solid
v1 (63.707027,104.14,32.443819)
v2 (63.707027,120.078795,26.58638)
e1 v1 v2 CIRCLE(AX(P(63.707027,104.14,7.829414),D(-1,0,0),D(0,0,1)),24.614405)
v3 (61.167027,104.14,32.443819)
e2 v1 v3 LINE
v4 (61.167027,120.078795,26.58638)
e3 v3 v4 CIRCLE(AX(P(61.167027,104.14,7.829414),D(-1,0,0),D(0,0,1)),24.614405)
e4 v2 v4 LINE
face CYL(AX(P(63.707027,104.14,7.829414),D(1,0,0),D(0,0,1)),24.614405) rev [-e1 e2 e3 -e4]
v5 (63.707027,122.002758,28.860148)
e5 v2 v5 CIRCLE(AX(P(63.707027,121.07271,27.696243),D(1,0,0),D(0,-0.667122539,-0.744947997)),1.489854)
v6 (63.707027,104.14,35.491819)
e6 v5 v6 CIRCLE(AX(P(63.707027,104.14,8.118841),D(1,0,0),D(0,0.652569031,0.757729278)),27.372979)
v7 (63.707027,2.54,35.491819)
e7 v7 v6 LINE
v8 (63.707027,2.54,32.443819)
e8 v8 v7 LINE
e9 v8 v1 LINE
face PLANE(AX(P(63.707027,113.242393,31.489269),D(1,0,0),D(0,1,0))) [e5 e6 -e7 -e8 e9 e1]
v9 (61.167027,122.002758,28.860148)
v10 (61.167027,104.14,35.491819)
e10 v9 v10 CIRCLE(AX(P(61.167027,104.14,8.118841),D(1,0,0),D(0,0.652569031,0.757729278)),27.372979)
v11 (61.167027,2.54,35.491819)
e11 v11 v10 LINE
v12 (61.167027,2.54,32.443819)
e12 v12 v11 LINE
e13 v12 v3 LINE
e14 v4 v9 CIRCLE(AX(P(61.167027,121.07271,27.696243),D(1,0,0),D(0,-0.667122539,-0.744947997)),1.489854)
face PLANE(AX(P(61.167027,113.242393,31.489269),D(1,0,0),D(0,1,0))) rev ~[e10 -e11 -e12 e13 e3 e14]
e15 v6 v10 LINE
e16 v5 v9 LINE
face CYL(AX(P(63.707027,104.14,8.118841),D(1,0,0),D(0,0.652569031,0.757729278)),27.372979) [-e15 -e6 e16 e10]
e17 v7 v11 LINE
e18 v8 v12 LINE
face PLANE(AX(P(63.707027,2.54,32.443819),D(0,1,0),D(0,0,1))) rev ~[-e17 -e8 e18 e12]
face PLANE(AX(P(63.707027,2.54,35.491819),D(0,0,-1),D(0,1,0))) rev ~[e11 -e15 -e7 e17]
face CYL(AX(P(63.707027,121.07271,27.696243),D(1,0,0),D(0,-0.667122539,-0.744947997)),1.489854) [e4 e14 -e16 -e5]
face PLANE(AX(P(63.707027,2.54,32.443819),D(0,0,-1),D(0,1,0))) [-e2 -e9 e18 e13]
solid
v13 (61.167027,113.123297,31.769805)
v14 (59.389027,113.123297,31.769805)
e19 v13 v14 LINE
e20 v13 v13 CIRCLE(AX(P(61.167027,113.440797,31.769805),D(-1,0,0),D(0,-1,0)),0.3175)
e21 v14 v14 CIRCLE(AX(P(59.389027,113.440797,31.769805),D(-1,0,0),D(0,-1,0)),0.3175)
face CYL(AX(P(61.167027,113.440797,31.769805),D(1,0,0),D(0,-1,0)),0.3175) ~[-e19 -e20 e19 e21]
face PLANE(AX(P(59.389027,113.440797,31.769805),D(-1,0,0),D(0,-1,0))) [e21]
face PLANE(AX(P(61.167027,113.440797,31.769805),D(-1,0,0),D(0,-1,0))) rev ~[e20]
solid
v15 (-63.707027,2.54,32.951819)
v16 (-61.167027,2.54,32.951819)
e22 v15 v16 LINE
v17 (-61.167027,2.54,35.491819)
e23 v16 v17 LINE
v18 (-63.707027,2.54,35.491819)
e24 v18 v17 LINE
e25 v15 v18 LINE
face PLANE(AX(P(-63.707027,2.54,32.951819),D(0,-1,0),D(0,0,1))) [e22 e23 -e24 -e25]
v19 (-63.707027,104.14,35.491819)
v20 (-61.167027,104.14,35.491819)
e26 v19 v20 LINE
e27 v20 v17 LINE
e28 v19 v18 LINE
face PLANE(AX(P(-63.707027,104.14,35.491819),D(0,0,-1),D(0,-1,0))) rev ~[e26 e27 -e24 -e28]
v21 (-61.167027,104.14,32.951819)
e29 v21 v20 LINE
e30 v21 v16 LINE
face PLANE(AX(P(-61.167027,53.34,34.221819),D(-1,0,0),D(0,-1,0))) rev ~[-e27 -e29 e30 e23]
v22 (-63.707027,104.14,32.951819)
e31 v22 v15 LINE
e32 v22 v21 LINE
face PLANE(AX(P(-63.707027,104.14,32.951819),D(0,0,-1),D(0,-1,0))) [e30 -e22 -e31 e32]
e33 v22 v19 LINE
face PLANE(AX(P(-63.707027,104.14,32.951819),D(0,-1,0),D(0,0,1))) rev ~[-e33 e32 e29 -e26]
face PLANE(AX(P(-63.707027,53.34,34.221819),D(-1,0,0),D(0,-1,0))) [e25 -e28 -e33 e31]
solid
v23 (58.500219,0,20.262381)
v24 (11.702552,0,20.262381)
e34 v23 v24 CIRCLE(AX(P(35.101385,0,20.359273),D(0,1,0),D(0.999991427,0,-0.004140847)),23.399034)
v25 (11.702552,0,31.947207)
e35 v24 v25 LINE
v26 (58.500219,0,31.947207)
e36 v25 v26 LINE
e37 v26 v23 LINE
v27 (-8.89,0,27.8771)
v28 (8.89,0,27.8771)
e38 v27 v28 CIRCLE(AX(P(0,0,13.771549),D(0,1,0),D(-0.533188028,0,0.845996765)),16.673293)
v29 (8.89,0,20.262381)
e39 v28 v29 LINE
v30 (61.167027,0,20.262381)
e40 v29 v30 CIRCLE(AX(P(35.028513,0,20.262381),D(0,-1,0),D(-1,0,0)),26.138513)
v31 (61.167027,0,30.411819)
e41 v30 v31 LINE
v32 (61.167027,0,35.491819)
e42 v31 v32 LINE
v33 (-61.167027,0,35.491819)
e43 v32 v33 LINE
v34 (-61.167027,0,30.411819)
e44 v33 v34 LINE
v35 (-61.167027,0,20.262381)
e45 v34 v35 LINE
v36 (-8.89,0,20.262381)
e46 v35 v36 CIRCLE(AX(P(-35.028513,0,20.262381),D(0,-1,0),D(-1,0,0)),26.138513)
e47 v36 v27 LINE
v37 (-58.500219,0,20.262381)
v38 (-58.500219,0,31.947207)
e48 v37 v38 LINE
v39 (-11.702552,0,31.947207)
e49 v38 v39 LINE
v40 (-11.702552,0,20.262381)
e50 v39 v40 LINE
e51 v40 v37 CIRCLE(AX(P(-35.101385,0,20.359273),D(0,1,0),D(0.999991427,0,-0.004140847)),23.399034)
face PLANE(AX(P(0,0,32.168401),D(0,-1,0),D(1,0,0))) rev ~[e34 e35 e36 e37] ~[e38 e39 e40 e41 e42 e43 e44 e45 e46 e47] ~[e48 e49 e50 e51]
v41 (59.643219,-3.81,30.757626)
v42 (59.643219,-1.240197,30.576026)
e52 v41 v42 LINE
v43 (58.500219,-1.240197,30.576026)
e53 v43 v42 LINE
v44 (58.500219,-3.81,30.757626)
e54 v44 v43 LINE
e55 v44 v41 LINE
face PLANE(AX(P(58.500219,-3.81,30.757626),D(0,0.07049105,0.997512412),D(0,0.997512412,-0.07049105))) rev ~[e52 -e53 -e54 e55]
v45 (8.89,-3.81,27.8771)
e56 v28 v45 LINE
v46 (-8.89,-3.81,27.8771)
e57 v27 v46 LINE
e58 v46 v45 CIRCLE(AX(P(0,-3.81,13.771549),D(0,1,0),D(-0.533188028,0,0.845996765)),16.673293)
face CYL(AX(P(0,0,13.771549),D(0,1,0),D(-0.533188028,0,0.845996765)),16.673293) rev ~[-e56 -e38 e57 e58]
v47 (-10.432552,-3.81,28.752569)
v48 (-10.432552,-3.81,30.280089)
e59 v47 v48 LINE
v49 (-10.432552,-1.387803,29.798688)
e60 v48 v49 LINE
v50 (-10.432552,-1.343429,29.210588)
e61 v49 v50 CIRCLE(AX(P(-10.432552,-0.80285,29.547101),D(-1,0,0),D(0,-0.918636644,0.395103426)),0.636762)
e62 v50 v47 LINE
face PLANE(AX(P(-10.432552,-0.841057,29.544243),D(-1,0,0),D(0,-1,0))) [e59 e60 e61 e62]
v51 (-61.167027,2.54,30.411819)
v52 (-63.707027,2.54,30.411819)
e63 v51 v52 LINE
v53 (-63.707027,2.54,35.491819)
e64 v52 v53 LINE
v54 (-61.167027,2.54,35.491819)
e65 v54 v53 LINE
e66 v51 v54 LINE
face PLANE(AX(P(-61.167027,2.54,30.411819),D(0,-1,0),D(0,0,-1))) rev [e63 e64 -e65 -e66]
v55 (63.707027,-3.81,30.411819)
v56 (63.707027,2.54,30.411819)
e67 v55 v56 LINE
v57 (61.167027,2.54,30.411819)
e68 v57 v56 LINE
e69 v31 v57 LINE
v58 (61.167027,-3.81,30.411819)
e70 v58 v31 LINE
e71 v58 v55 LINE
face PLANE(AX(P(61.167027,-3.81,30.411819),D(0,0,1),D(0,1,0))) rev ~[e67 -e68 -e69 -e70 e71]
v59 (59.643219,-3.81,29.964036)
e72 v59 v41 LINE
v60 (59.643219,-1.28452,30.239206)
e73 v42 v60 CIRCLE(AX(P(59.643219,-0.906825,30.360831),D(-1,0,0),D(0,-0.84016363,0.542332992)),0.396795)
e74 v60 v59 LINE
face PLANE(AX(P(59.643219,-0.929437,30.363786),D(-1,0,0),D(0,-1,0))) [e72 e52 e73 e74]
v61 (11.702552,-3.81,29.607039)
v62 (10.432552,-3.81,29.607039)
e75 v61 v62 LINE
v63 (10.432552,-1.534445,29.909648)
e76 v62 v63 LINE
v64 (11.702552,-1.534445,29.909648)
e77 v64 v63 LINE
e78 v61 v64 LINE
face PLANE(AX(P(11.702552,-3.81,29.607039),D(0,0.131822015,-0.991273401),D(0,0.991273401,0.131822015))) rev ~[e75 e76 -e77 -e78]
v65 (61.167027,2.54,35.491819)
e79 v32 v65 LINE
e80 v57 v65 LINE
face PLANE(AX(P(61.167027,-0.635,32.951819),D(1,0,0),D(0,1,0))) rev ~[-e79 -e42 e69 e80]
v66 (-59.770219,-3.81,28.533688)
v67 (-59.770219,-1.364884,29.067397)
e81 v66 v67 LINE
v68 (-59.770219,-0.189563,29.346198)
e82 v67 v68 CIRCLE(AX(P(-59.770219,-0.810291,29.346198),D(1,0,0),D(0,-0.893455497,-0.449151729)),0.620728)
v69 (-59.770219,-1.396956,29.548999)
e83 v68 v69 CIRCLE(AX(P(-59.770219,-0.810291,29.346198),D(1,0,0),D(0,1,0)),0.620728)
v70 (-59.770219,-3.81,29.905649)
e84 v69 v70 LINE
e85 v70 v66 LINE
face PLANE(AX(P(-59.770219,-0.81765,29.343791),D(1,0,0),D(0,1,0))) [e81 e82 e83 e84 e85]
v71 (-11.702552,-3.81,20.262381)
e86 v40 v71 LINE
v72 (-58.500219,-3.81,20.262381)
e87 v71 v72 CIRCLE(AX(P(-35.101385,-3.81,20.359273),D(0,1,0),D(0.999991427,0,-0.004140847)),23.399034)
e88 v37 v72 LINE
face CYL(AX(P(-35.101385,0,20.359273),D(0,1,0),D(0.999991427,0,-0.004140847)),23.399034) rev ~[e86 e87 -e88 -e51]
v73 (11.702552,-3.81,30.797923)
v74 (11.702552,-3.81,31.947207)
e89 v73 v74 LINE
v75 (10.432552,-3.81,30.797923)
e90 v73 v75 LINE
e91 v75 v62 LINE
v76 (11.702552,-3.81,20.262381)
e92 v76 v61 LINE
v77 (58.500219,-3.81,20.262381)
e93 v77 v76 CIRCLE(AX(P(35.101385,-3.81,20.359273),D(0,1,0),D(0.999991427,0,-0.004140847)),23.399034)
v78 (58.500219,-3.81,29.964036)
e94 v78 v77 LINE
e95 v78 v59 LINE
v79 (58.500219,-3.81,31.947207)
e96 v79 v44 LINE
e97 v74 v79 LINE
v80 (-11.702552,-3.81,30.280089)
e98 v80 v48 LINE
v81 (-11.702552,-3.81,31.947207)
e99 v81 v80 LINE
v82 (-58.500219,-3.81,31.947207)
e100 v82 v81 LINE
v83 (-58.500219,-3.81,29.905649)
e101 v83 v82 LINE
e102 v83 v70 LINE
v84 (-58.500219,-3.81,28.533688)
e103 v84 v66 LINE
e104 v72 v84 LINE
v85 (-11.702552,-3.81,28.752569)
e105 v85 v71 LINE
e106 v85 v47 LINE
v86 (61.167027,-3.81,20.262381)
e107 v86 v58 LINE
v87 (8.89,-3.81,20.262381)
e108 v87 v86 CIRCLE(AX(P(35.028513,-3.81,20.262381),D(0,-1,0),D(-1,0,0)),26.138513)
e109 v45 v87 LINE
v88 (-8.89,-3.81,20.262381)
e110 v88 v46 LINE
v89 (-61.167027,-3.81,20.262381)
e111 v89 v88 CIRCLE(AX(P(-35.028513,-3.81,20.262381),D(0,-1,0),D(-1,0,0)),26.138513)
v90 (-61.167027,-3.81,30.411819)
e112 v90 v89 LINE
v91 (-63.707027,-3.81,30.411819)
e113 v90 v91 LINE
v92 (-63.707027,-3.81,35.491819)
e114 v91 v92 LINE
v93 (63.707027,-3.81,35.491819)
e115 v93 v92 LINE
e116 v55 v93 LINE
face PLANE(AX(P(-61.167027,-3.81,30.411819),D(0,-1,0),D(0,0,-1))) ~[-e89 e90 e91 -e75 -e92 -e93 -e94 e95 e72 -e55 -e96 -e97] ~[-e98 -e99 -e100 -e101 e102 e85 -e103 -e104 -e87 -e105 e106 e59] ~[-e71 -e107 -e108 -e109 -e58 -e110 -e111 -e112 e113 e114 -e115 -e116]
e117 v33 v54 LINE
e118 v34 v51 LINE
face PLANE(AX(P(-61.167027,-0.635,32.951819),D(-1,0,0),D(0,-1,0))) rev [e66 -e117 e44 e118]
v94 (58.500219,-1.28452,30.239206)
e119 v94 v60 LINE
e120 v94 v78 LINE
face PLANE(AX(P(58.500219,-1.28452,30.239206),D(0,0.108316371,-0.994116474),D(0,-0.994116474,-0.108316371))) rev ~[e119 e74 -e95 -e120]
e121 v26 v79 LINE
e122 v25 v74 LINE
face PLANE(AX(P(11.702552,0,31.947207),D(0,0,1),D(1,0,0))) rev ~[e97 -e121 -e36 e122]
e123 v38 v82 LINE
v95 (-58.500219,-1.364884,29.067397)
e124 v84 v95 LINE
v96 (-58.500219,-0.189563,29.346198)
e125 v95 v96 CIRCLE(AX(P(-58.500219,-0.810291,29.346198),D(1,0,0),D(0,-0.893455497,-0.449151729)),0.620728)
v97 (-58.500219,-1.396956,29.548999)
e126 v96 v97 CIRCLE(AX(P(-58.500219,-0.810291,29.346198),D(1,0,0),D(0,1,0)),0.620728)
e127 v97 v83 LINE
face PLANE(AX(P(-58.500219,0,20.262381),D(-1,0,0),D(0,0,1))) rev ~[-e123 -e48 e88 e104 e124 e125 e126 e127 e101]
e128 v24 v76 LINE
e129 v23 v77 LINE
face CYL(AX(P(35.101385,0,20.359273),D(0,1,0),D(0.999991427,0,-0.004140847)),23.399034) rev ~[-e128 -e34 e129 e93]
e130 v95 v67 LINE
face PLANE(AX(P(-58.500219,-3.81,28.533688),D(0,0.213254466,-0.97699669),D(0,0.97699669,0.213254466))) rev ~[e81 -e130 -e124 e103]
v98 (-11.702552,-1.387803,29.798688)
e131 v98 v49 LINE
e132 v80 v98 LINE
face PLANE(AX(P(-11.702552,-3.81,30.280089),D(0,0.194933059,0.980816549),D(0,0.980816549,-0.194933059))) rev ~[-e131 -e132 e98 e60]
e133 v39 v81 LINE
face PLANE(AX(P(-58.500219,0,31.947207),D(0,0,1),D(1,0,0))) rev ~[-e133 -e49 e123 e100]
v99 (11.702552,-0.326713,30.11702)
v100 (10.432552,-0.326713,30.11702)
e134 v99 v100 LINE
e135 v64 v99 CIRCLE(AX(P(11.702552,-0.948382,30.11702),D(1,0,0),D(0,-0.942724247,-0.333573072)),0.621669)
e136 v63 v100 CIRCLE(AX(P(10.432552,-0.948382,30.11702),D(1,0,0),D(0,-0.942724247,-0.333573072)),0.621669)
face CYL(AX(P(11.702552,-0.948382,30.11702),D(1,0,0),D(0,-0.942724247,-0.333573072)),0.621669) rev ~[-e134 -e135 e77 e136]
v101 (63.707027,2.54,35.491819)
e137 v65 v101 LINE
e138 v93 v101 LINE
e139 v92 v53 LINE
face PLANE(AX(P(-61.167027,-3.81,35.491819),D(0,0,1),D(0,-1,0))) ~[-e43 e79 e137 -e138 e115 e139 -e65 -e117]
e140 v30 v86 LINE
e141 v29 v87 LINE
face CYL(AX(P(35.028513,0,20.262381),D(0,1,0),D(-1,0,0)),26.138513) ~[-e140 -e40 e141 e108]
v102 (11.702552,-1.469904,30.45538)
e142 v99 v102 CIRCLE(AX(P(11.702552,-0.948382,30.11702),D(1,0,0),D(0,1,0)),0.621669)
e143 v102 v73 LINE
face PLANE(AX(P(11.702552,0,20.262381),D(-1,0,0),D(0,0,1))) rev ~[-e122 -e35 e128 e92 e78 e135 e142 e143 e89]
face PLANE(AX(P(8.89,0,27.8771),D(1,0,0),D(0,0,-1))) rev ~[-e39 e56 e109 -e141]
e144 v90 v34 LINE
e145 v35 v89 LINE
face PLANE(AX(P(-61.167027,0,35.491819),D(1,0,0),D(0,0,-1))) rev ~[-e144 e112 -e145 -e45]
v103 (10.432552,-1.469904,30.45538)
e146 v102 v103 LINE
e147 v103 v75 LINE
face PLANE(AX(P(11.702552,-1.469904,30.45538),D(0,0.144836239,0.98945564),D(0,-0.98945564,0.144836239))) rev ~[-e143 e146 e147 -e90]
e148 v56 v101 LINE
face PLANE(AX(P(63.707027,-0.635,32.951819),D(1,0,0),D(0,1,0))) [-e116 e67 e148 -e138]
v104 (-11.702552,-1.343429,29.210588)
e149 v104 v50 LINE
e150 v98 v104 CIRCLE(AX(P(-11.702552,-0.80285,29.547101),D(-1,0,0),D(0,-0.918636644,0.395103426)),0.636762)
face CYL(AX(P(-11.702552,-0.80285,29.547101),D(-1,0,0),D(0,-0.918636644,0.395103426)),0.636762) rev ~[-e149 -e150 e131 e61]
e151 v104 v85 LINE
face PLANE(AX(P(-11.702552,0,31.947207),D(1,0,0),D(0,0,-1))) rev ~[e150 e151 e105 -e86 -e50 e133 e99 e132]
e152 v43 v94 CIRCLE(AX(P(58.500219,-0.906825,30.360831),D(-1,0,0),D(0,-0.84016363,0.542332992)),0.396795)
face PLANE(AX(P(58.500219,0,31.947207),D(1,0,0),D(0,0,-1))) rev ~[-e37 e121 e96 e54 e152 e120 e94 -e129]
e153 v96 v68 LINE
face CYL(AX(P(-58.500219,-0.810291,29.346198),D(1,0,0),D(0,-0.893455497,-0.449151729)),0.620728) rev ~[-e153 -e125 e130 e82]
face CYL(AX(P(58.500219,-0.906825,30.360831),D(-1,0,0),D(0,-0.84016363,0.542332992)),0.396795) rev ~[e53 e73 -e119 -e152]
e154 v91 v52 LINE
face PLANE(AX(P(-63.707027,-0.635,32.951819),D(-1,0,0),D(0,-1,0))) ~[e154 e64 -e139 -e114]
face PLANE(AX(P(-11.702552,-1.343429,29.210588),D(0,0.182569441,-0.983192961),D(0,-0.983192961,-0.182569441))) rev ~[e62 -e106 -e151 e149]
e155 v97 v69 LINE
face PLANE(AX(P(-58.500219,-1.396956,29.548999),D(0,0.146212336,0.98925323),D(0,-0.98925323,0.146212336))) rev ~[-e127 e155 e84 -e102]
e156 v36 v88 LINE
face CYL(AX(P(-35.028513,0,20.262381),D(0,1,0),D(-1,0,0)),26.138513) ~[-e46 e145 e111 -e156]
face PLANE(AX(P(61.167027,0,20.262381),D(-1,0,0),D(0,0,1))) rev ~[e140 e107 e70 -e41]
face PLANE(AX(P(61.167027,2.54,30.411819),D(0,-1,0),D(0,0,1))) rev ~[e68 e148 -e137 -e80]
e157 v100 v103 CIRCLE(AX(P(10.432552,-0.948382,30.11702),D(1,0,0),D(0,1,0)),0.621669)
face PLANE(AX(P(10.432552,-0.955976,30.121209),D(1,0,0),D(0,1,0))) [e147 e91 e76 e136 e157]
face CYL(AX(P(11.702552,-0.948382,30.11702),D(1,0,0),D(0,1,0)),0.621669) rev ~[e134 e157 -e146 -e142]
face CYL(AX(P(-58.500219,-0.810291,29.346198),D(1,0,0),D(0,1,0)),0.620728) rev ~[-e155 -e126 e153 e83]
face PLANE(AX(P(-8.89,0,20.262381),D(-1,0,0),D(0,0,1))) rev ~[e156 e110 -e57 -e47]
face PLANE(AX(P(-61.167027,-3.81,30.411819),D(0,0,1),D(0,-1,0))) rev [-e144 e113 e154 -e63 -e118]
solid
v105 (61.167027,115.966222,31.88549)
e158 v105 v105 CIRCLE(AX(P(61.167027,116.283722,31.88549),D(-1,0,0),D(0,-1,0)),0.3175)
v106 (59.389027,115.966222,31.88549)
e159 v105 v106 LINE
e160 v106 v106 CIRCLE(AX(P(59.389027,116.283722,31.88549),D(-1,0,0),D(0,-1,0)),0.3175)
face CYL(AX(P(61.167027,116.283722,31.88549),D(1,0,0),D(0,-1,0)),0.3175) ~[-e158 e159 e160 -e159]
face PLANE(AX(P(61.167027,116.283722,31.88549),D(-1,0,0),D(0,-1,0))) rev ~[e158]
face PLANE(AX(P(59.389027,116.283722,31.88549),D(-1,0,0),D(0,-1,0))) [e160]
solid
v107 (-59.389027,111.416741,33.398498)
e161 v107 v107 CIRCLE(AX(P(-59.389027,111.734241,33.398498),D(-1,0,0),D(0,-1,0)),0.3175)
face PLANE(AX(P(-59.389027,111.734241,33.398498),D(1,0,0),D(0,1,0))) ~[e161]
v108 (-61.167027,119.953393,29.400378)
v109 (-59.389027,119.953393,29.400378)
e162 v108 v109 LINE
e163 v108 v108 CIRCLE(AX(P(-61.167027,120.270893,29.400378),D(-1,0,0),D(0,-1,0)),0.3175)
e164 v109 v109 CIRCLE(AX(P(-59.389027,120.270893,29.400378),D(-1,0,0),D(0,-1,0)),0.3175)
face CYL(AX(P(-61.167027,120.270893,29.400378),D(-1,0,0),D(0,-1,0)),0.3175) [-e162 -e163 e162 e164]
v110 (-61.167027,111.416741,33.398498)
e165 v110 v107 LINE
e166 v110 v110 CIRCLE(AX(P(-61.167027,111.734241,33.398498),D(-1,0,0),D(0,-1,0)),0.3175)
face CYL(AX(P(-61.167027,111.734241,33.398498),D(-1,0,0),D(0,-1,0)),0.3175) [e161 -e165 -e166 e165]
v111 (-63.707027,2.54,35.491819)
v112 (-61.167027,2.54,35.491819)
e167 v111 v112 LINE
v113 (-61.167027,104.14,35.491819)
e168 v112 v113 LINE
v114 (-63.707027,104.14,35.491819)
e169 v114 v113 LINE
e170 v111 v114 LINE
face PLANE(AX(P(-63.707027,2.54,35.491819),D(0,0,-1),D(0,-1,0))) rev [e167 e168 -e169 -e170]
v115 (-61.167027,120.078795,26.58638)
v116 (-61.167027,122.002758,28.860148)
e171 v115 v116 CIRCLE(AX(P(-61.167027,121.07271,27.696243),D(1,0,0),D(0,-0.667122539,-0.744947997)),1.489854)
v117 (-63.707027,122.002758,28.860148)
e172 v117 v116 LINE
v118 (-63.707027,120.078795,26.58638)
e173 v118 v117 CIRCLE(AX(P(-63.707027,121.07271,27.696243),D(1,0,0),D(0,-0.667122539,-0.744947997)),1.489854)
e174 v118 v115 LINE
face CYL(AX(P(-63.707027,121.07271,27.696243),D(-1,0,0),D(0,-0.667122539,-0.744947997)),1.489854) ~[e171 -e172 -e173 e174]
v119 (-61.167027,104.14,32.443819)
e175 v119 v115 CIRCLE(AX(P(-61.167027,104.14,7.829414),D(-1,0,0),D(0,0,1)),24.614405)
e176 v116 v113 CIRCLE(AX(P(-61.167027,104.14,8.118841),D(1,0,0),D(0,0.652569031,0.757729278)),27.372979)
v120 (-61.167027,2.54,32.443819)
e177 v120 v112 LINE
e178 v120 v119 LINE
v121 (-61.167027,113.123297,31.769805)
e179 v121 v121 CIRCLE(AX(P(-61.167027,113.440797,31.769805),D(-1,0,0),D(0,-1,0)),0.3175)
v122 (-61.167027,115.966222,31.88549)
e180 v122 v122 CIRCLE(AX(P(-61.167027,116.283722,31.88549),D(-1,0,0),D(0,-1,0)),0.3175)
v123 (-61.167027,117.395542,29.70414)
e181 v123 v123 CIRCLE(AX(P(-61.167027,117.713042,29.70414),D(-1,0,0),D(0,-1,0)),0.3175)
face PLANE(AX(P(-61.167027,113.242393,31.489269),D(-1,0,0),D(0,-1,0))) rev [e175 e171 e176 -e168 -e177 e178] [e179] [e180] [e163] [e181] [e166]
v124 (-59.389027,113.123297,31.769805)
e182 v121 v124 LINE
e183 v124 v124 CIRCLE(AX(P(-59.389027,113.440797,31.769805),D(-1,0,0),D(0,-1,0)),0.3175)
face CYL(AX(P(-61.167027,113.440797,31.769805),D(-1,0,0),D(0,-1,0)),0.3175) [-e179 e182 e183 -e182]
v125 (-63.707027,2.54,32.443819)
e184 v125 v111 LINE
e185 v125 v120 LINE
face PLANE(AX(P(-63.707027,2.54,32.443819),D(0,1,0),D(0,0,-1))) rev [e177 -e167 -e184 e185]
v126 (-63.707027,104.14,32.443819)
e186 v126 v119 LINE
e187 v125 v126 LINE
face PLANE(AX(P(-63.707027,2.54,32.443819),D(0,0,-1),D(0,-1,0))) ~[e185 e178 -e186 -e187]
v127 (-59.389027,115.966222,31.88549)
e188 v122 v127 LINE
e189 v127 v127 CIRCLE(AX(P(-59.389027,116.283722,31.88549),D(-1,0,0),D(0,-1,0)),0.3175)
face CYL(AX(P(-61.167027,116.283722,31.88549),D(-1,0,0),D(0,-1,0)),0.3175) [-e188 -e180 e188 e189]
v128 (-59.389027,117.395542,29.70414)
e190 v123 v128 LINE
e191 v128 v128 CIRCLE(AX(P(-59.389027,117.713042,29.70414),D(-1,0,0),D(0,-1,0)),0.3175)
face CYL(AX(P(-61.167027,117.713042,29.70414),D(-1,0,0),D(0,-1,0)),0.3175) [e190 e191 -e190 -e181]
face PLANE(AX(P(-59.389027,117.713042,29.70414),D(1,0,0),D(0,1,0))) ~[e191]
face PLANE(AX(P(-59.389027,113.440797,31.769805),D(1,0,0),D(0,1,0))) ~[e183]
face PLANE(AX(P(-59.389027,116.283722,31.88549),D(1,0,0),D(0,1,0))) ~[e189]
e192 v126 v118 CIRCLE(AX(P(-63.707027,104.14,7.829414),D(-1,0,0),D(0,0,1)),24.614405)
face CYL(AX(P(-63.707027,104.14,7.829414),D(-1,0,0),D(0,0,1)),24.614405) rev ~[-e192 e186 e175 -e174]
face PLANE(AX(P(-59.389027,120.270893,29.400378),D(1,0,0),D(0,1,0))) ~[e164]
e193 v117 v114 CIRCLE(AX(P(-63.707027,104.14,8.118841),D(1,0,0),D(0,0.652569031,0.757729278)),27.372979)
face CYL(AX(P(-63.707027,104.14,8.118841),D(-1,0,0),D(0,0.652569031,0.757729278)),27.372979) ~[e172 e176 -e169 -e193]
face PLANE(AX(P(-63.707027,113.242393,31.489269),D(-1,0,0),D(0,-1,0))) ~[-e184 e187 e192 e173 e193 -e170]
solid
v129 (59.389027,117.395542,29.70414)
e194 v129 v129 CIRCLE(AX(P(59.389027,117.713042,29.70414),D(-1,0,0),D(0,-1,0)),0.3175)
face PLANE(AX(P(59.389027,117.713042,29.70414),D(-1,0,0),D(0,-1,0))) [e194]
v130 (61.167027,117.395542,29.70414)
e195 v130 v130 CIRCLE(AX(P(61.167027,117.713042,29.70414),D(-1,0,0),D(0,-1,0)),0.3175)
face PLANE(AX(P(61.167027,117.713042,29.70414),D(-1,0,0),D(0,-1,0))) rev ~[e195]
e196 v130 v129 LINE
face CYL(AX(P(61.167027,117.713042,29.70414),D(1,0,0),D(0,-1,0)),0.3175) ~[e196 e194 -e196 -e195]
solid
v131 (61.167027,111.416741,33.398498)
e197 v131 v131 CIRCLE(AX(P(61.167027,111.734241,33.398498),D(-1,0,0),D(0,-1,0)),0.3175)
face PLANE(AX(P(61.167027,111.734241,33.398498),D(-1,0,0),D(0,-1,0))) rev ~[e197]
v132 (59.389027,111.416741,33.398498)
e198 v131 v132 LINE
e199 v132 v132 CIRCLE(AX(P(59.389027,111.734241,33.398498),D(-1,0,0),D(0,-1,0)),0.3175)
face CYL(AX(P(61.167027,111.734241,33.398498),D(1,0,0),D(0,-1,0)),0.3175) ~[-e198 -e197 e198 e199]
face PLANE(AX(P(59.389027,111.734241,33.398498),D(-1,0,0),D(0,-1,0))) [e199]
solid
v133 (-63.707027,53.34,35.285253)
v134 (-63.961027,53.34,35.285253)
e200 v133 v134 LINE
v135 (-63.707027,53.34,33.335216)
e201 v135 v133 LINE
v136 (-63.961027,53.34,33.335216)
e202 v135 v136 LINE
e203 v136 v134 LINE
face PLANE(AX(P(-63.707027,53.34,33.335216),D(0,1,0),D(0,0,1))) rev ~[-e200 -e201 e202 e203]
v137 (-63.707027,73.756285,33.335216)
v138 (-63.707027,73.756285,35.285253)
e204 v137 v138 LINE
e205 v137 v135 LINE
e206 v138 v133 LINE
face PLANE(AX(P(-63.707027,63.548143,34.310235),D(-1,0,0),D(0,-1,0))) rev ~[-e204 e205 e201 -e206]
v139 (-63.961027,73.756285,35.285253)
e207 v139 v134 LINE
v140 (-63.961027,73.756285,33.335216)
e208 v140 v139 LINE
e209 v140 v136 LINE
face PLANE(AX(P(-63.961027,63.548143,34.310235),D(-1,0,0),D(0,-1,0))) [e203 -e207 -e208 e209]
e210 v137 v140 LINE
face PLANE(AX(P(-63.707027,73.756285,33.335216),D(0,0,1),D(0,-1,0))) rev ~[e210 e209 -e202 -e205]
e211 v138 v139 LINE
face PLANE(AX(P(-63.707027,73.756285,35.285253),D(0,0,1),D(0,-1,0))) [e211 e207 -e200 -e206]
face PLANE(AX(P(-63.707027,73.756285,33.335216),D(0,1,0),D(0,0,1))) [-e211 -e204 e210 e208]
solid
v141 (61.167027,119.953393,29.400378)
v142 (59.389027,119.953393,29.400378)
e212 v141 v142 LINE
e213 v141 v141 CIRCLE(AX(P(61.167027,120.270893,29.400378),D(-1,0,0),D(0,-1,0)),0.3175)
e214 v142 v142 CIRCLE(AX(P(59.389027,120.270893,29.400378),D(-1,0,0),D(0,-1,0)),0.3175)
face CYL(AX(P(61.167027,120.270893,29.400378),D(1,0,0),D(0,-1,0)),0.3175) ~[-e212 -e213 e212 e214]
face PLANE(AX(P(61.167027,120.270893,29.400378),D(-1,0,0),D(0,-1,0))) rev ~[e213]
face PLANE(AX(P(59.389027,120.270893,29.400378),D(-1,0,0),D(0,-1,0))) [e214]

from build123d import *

# Parameters (mm, degrees)
F1_DEPTH  = 3.81
F2_W      = 6.35
F2_H      = 5.08
F3_DEPTH  = 2.54
F5_W      = 101.6
F5_H      = 3.048
F6_DEPTH  = 2.54
F7_W      = 101.6
F7_H      = 2.54
F8_DEPTH  = 2.54
F9_W      = 20.4162850118
F9_H      = 1.9500367343
F10_DEPTH = 0.254
F12_DEPTH = 2.54
F14_R     = 0.3175
F15_DEPTH = 1.778
F18_DEPTH = 1.143
F20_DEPTH = 1.27
F22_DEPTH = 1.27
F24_DEPTH = 1.27


with BuildPart() as f1:
    # F0 (on Front) → F1 (new body)
    with BuildSketch(Plane.XZ):
        with BuildLine():
            Line((8.89, 35.491819303), (0, 35.491819303))
            Line((0, 35.491819303), (-8.89, 35.491819303))
            Line((-8.89, 35.491819303), (-8.89, 27.8771001825))
            ThreePointArc((-8.89, 27.8771001825), (0, 30.4448411771), (8.89, 27.8771001825))
            Line((8.89, 27.8771001825), (8.89, 35.491819303))
        make_face()
        with BuildLine():
            Line((-8.89, 27.8771001825), (-8.89, 35.491819303))
            Line((-8.89, 35.491819303), (-61.167026878, 35.491819303))
            Line((-61.167026878, 35.491819303), (-61.167026878, 20.2623810619))
            ThreePointArc((-61.167026878, 20.2623810619), (-35.028513439, -5.8761323771), (-8.89, 20.2623810619))
            Line((-8.89, 20.2623810619), (-8.89, 27.8771001825))
        make_face()
        with BuildLine():
            ThreePointArc((-11.7025515065, 20.2623810619), (-35.1013853215, -3.0397615448), (-58.5002191365, 20.2623810619))
            Line((-58.5002191365, 20.2623810619), (-58.5002191365, 31.9472067058))
            Line((-58.5002191365, 31.9472067058), (-11.7025515065, 31.9472067058))
            Line((-11.7025515065, 31.9472067058), (-11.7025515065, 20.2623810619))
        make_face(mode=Mode.SUBTRACT)
        with BuildLine():
            Line((61.167026878, 35.491819303), (8.89, 35.491819303))
            Line((8.89, 35.491819303), (8.89, 27.8771001825))
            Line((8.89, 27.8771001825), (8.89, 20.2623810619))
            ThreePointArc((8.89, 20.2623810619), (35.028513439, -5.8761323771), (61.167026878, 20.2623810619))
            Line((61.167026878, 20.2623810619), (61.167026878, 35.491819303))
        make_face()
        with BuildLine():
            Line((11.7025515065, 31.9472067058), (58.5002191365, 31.9472067058))
            Line((58.5002191365, 31.9472067058), (58.5002191365, 20.2623810619))
            ThreePointArc((58.5002191365, 20.2623810619), (35.1013853215, -3.0397615448), (11.7025515065, 20.2623810619))
            Line((11.7025515065, 20.2623810619), (11.7025515065, 31.9472067058))
        make_face(mode=Mode.SUBTRACT)
    extrude(amount=F1_DEPTH)

    # F2 (on face) → F3 (join)
    with BuildSketch(Plane.YZ.offset(61.167026878)):
        with Locations((-0.635, 32.951819303)):
            Rectangle(F2_W, F2_H)
    extrude(amount=F3_DEPTH)

    # F4: F1 across plane


with BuildPart() as f1_1:
    add(f1.part)
    add(f1.part.mirror(Plane.YZ))

    # F17 (on face) → F18 (cut)
    with BuildSketch(Plane(origin=(58.5002191365, 0, 0), x_dir=(0, -1, 0), z_dir=(-1, 0, 0))):
        with BuildLine():
            ThreePointArc((1.2845198591, 30.239206098), (1.2988156365, 30.2992732373), (1.303619671, 30.3608309478))
            ThreePointArc((1.303619671, 30.3608309478), (1.2874340011, 30.4730040235), (1.2401974525, 30.5760257848))
            ThreePointArc((1.2401974525, 30.5760257848), (0.5134218421, 30.3090626702), (1.2845198591, 30.239206098))
        make_face()
        with BuildLine():
            ThreePointArc((1.2401974525, 30.5760257848), (1.2874340011, 30.4730040235), (1.303619671, 30.3608309478))
            ThreePointArc((1.303619671, 30.3608309478), (1.2988156365, 30.2992732373), (1.2845198591, 30.239206098))
            Line((1.2845198591, 30.239206098), (3.81, 29.9640362842))
            Line((3.81, 29.9640362842), (3.81, 30.7576256113))
            Line((3.81, 30.7576256113), (1.2401974525, 30.5760257848))
        make_face()
    extrude(amount=-F18_DEPTH, mode=Mode.SUBTRACT)

    # F19 (on face) → F20 (cut)
    with BuildSketch(Plane.YZ.offset(11.7025515065)):
        with BuildLine():
            ThreePointArc((-1.5344448459, 29.9096479588), (-0.843178998, 29.5043172702), (-0.3267133253, 30.1170200109))
            ThreePointArc((-0.3267133253, 30.1170200109), (-0.771947349, 30.7131266136), (-1.469903859, 30.455380367))
            ThreePointArc((-1.469903859, 30.455380367), (-1.5657489749, 30.1900328091), (-1.5344448459, 29.9096479588))
        make_face()
        with BuildLine():
            ThreePointArc((-1.5344448459, 29.9096479588), (-1.5657489749, 30.1900328091), (-1.469903859, 30.455380367))
            Line((-1.469903859, 30.455380367), (-3.81, 30.7979229838))
            Line((-3.81, 30.7979229838), (-3.81, 29.607038945))
            Line((-3.81, 29.607038945), (-1.5344448459, 29.9096479588))
        make_face()
    extrude(amount=-F20_DEPTH, mode=Mode.SUBTRACT)

    # F21 (on face) → F22 (cut)
    with BuildSketch(Plane.YZ.offset(-58.5002191365)):
        with BuildLine():
            ThreePointArc((-1.3648844893, 29.0673966875), (-0.6670225121, 28.7422296785), (-0.189563217, 29.3461978436))
            ThreePointArc((-0.189563217, 29.3461978436), (-0.707470296, 29.9583508822), (-1.3969558464, 29.5489992474))
            ThreePointArc((-1.3969558464, 29.5489992474), (-1.4296478817, 29.304953043), (-1.3648844893, 29.0673966875))
        make_face()
        with BuildLine():
            ThreePointArc((-1.3648844893, 29.0673966875), (-1.4296478817, 29.304953043), (-1.3969558464, 29.5489992474))
            Line((-1.3969558464, 29.5489992474), (-3.81, 29.9056489021))
            Line((-3.81, 29.9056489021), (-3.81, 28.5336878151))
            Line((-3.81, 28.5336878151), (-1.3648844893, 29.0673966875))
        make_face()
    extrude(amount=-F22_DEPTH, mode=Mode.SUBTRACT)

    # F23 (on face) → F24 (cut)
    with BuildSketch(Plane(origin=(-11.7025515065, 0, 0), x_dir=(0, -1, 0), z_dir=(-1, 0, 0))):
        with BuildLine():
            ThreePointArc((1.3434285805, 29.2105876086), (1.4150944565, 29.3721062282), (1.4396124445, 29.5471008867))
            ThreePointArc((1.4396124445, 29.5471008867), (1.4265256847, 29.6755339351), (1.3878033244, 29.7986878633))
            ThreePointArc((1.3878033244, 29.7986878633), (0.1678927477, 29.5950112055), (1.3434285805, 29.2105876086))
        make_face()
        with BuildLine():
            ThreePointArc((1.3878033244, 29.7986878633), (1.4265256847, 29.6755339351), (1.4396124445, 29.5471008867))
            ThreePointArc((1.4396124445, 29.5471008867), (1.4150944565, 29.3721062282), (1.3434285805, 29.2105876086))
            Line((1.3434285805, 29.2105876086), (3.81, 28.7525691092))
            Line((3.81, 28.7525691092), (3.81, 30.2800890058))
            Line((3.81, 30.2800890058), (1.3878033244, 29.7986878633))
        make_face()
    extrude(amount=-F24_DEPTH, mode=Mode.SUBTRACT)


with BuildPart() as f6:
    # F5 (on face) → F6 (new body)
    with BuildSketch(Plane.YZ.offset(63.707026878)):
        with Locations((53.34, 33.967819303)):
            Rectangle(F5_W, F5_H)
    extrude(amount=-F6_DEPTH)

    # F11 (on face) → F12 (join)
    with BuildSketch(Plane.YZ.offset(63.707026878)):
        with BuildLine():
            ThreePointArc((104.14, 32.443819303), (112.6305060514, 30.9330988595), (120.0787946582, 26.5863798559))
            ThreePointArc((120.0787946582, 26.5863798559), (122.210042136, 26.7338822785), (122.0027580857, 28.8601480424))
            ThreePointArc((122.0027580857, 28.8601480424), (113.667029838, 33.780400665), (104.14, 35.491819303))
            Line((104.14, 35.491819303), (104.14, 32.443819303))
        make_face()
    extrude(amount=-F12_DEPTH)


with BuildPart() as f8:
    # F7 (on face) → F8 (new body)
    with BuildSketch(Plane(origin=(-63.707026878, 0, 0), x_dir=(0, -1, 0), z_dir=(-1, 0, 0))):
        with Locations((-53.34, 34.221819303)):
            Rectangle(F7_W, F7_H)
    extrude(amount=-F8_DEPTH)


with BuildPart() as f10:
    # F9 (on face) → F10 (new body)
    with BuildSketch(Plane(origin=(-63.707026878, 0, 0), x_dir=(0, -1, 0), z_dir=(-1, 0, 0))):
        with Locations((-63.5481425059, 34.3102347106)):
            Rectangle(F9_W, F9_H)
    extrude(amount=F10_DEPTH)


with BuildPart() as f13_1:
    # F13: instance of F6
    add(f6.part.mirror(Plane.YZ))

    # F16: F15d, F15e, F15b, F15, F15c across plane


with BuildPart() as f15:
    # F14 (on face) → F15 (new body)
    with BuildSketch(Plane(origin=(61.167026878, 0, 0), x_dir=(0, -1, 0), z_dir=(-1, 0, 0))):
        with Locations((-120.2708929777, 29.4003784657)):
            Circle(F14_R)
    extrude(amount=F15_DEPTH)


with BuildPart() as f15b:
    # F14 (on face) → F15, piece 2 (new body)
    with BuildSketch(Plane(origin=(61.167026878, 0, 0), x_dir=(0, -1, 0), z_dir=(-1, 0, 0))):
        with Locations((-117.7130416036, 29.7041404992)):
            Circle(F14_R)
    extrude(amount=F15_DEPTH)


with BuildPart() as f15c:
    # F14 (on face) → F15, piece 3 (new body)
    with BuildSketch(Plane(origin=(61.167026878, 0, 0), x_dir=(0, -1, 0), z_dir=(-1, 0, 0))):
        with Locations((-116.2837222219, 31.8854898214)):
            Circle(F14_R)
    extrude(amount=F15_DEPTH)


with BuildPart() as f15d:
    # F14 (on face) → F15, piece 4 (new body)
    with BuildSketch(Plane(origin=(61.167026878, 0, 0), x_dir=(0, -1, 0), z_dir=(-1, 0, 0))):
        with Locations((-113.4407967329, 31.7698046565)):
            Circle(F14_R)
    extrude(amount=F15_DEPTH)


with BuildPart() as f15e:
    # F14 (on face) → F15, piece 5 (new body)
    with BuildSketch(Plane(origin=(61.167026878, 0, 0), x_dir=(0, -1, 0), z_dir=(-1, 0, 0))):
        with Locations((-111.7342412472, 33.3984978497)):
            Circle(F14_R)
    extrude(amount=F15_DEPTH)


with BuildPart() as f13_1_1:
    add(f13_1.part)
    add(f15d.part.mirror(Plane.YZ))
    add(f15e.part.mirror(Plane.YZ))
    add(f15b.part.mirror(Plane.YZ))
    add(f15.part.mirror(Plane.YZ))
    add(f15c.part.mirror(Plane.YZ))


solid = Compound([f1_1.part, f6.part, f8.part, f10.part, f15.part, f15b.part, f15c.part, f15d.part, f15e.part, f13_1_1.part])
